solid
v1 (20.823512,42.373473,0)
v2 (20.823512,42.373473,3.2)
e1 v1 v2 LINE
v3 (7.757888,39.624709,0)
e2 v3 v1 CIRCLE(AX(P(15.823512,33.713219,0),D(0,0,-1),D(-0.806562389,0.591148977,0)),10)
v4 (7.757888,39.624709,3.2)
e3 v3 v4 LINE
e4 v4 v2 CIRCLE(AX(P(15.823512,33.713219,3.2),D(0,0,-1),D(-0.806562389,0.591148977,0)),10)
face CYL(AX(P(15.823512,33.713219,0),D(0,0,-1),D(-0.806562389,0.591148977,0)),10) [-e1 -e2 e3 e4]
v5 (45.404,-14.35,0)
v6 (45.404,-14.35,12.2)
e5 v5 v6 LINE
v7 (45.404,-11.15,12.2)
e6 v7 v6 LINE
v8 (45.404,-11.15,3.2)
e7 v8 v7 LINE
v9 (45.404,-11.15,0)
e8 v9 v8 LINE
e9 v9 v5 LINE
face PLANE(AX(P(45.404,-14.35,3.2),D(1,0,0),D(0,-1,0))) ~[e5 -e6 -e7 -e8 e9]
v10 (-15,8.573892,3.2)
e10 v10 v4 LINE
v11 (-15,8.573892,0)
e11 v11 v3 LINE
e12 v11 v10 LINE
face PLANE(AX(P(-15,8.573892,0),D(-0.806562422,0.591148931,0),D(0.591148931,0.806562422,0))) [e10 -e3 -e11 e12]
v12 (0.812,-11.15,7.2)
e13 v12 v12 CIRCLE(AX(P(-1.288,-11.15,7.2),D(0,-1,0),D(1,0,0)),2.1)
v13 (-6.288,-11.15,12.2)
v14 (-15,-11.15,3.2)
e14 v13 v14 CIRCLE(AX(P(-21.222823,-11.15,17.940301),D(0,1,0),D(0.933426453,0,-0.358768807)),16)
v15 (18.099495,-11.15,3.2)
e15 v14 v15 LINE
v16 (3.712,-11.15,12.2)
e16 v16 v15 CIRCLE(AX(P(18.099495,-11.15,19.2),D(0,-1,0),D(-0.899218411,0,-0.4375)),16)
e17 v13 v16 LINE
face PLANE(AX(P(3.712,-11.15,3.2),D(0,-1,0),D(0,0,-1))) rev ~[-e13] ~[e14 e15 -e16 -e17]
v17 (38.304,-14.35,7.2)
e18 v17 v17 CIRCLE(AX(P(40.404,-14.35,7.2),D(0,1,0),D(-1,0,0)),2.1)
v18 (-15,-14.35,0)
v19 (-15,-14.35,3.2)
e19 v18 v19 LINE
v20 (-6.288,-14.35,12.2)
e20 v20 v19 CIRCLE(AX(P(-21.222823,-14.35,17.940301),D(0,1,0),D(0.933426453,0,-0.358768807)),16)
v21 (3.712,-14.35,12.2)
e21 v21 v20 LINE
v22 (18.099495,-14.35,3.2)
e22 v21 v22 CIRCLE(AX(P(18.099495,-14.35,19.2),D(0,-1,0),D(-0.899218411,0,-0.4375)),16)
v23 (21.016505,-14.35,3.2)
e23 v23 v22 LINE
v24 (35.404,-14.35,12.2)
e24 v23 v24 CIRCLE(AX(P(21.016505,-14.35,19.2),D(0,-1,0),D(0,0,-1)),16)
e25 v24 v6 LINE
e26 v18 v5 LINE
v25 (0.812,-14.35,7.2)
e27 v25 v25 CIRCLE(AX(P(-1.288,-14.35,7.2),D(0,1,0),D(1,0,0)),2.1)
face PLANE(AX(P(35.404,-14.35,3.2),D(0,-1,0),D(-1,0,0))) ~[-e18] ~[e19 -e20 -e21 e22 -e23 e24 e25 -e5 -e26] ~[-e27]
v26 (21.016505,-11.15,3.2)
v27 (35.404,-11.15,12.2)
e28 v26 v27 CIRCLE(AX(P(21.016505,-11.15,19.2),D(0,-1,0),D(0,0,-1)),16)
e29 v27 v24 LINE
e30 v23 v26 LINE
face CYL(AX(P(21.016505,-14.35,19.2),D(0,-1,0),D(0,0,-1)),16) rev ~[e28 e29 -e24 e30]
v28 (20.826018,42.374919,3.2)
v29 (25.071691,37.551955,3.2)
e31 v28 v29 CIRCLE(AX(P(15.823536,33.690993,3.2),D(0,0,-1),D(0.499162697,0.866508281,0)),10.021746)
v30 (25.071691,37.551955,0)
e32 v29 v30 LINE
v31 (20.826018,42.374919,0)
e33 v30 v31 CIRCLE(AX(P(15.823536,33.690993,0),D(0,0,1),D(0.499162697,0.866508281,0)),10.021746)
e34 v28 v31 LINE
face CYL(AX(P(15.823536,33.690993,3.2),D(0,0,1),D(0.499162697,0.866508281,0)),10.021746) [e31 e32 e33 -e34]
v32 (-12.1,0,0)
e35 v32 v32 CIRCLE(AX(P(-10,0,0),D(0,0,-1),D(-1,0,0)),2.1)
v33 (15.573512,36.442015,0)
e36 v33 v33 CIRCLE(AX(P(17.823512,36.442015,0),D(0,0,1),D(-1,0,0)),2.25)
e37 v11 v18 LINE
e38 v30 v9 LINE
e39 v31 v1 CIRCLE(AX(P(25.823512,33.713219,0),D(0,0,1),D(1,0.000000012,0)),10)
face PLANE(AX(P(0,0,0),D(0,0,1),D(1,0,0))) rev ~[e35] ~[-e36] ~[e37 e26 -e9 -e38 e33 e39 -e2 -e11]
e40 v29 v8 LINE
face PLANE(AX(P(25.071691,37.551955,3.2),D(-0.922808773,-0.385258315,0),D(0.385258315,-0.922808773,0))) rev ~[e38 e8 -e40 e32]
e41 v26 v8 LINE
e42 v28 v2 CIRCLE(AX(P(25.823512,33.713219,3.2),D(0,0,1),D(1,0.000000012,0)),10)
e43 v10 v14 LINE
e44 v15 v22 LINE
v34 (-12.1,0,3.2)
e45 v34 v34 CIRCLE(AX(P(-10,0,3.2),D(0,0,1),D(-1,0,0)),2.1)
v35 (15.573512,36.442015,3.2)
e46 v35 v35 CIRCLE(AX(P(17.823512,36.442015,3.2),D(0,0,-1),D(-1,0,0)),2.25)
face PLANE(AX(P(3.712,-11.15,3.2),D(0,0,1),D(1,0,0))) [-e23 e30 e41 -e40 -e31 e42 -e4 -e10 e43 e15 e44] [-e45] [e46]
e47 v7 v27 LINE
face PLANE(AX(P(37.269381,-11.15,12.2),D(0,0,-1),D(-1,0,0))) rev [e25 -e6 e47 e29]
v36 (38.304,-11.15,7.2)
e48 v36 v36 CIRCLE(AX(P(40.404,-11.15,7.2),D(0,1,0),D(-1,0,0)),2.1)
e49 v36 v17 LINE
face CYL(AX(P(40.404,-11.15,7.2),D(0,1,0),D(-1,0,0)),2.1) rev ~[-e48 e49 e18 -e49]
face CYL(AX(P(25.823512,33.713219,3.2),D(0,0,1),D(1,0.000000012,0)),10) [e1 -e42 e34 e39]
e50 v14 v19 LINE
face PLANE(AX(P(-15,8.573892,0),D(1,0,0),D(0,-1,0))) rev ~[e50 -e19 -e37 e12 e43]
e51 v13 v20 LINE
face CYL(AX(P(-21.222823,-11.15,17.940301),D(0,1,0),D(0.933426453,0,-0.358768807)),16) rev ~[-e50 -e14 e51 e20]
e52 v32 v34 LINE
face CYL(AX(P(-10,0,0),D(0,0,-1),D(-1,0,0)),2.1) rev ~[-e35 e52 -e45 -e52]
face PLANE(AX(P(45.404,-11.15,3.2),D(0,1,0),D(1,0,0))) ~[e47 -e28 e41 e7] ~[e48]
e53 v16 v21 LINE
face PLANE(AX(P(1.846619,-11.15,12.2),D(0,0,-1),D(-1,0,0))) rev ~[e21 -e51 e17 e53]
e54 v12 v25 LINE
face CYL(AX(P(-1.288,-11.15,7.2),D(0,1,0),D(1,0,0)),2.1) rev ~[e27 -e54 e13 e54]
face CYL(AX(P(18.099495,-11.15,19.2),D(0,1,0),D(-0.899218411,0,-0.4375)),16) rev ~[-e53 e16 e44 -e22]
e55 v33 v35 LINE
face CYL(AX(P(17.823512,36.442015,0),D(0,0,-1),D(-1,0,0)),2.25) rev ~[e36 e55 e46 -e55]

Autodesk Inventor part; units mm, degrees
ref_plane "YZ Plane" through (0, 0, 0) normal (1, 0, 0) x (0, 1, 0)
ref_plane "XZ Plane" through (0, 0, 0) normal (0, 1, 0) x (-1, 0, 0)
ref_plane "XY Plane" through (0, 0, 0) normal (0, 0, 1) x (1, 0, 0)
sketch "Эскиз1" plane through (0, 0, 0) normal (0, 0, 1) x (1, 0, 0)
  circle A0 centre (0, 0) radius 2.1
  line L0 (-5, 14.35) -> (5, 14.35)
  line L1 (5, 14.35) -> (5, -14.35)
  line L2 (5, -14.35) -> (-5, -14.35)
  line L3 (-5, -14.35) -> (-5, 14.35)
  line L4 (-5, 14.35) -> (5, -14.35) construction
  line L5 (5, 14.35) -> (-5, -14.35) construction
  line L6 (-5, 7) -> (5, 7)
  dimension "d0" = 4.2
  dimension "d2" = 10
  dimension "d3" = 28.7
  dimension "d4" = 7
extrude "Выдавливание1" add sketch "Эскиз1" along normal blind 3.2 contours L6 L1 L2 L3
sketch "Эскиз2" plane through (0, 0, 3.2) normal (0, 0, 1) x (1, 0, 0)
  line L0 (5, -14.35) -> (5, 7) projected
  line L1 (5, -14.35) -> (-5, -14.35)
  line L2 (-5, -14.35) -> (-5, -11.15)
  line L3 (-5, -11.15) -> (5, -11.15)
  line L4 (5, -11.15) -> (5, -14.35)
  point P0 (0, 0)
  point P1 (5, -11.15)
  dimension "d7" = 10
  dimension "d8" = 3.2
extrude "Выдавливание2" add sketch "Эскиз2" along normal blind 13
sketch "Эскиз3" plane through (-5, -11.15, 16.2) normal (0, 1, 0) x (1, 0, 0)
  line L0 (0, 10) -> (10, 10) projected
  line L1 (5, 10) -> (5, 0)
  line L2 (0, 0) -> (10, 0) projected
  circle A0 centre (5, 5) radius 2.1
  point P0 (5, 16.2)
  dimension "d12" = 4.2
extrude "Выдавливание3" cut sketch "Эскиз3" against normal blind 13
sketch "Эскиз4" plane through (0, 0, 3.2) normal (0, 0, 1) x (1, 0, 0)
  circle A0 centre (27.823512, 36.442015) radius 2.691667
  line L0 (25.598764, 34.926903) -> (0, 0)
  line L1 (17.757888, 39.624709) -> (-5, 8.573892)
  line L2 (-5, 7) -> (-5, -11.15)
  line L3 (-5, 7) -> (-5, 8.573892)
  line L4 (-5, -14.35) -> (5, -14.35)
  line L5 (5, -14.35) -> (5, -11.15)
  line L6 (5, -11.15) -> (-5, -11.15)
  line L7 (-5, -11.15) -> (-5, -14.35)
  line L8 (27.823512, 36.442015) -> (27.823512, -3.381482)
  line L9 (35.823512, 33.713219) -> (35.823512, -14.35)
  arc A1 (35.823512, 33.713219) -> (17.757888, 39.624709) centre (25.823512, 33.713219) ccw
  line L10 (-5, -14.35) -> (35.823512, -14.35)
  circle A2 centre (27.823512, 36.442015) radius 2.25
  line L11 (-5, 8.573892) -> (-5, -14.35)
  circle A3 centre (0, 0) radius 2.1
  point P0 (-5, -8.15)
  point P1 (-5, -11.15)
  dimension "d15" = 10
  dimension "d16" = 8
  dimension "d17" = 10
  dimension "d18" = 4.5
extrude "Выдавливание4" add sketch "Эскиз4" against normal up to surface (3.2 mm away) contours A0 | A1 L9 L10 L5 L6 L2 L3 L1
ref_plane "РабПлоскость1" through (20.202, -14.35, 16.2) normal (-1, 0, 0) x (0, 0, 1)
mirror "Зеркальное отражение1" about plane through (20.202, -14.35, 16.2) normal (-1, 0, 0) of "Выдавливание2", "Выдавливание3"
sketch "Эскиз6" plane through (0, 0, 0) normal (0, 0, -1) x (-1, 0, 0)
  circle A0 centre (-17.823512, 36.442015) radius 2.25
  circle A1 centre (10, 0) radius 2.1
  line L0 (5, -14.35) -> (-35.823512, -14.35)
  line L1 (5, -14.35) -> (5, 8.573892)
  line L2 (15, 8.573892) -> (-7.757888, 39.624709)
  arc A2 (-7.757888, 39.624709) -> (-25.823512, 33.713219) centre (-15.823512, 33.713219) ccw
  line L3 (-25.823512, 33.713219) -> (-25.823512, -14.35)
  circle A3 centre (-27.823512, 36.442015) radius 2.25
  circle A4 centre (0, 0) radius 2.1
  line L4 (5, -14.35) -> (-35.823512, -14.35)
  line L5 (5, -14.35) -> (5, 8.573892)
  line L6 (5, 8.573892) -> (-17.757888, 39.624709)
  arc A5 (-17.757888, 39.624709) -> (-35.823512, 33.713219) centre (-25.823512, 33.713219) ccw
  line L7 (-35.823512, 33.713219) -> (-35.823512, -14.35)
  line L8 (-35.823512, -14.35) -> (-35.823512, -11.15)
  line L9 (-35.823512, -11.15) -> (-45.404, -11.15)
  line L10 (-45.404, -11.15) -> (-45.404, -14.35)
  line L11 (-45.404, -14.35) -> (-35.823512, -14.35)
  line L12 (-25.823512, -14.35) -> (-45.404, -14.35)
  line L13 (0, 0) -> (10, 0)
  line L14 (15, 8.573892) -> (15, -18.0489)
  line L15 (-5, -14.35) -> (-35.404, -14.35)
  line L16 (-8, -14.35) -> (16.577235, -14.35)
  line L17 (-45.404, -11.15) -> (-35.708646, 35.224555)
  point P0 (-10, 0)
  point P1 (-20.823512, 42.373473)
  point P2 (15, -14.35)
  point P3 (-16.942673, 38.512431)
  point P4 (-15.583961, 36.658607)
  point P5 (5, 8.573892)
  dimension "d35" = 10
extrude "Выдавливание5" add sketch "Эскиз6" against normal up to surface (3.2 mm away) contours A0 L6 A5 A2 L2 L14 L16 L1 | A5 L7 L9 L17 | L9 L7 L11 L10
extrude "Выдавливание6" cut sketch "Эскиз6" against normal blind 10 contours A0 L6 | L6 A0 | A1
sketch "Эскиз7" plane through (0, 0, 3.2) normal (0, 0, 1) x (1, 0, 0)
  circle A0 centre (0, 0) radius 2.1
  line L0 (35.404, -14.35) -> (35.404, -11.15)
  line L1 (5, -14.35) -> (35.404, -14.35)
  arc A1 (35.708646, 35.224555) -> (20.823512, 42.373473) centre (25.823512, 33.713219) ccw
  line L2 (30.823512, 42.373473) -> (-5, -8.15)
  line L3 (35.404, -11.15) -> (45.404, -11.15)
  arc A2 (20.823512, 42.373473) -> (7.757888, 39.624709) centre (15.823512, 33.713219) ccw
  line L4 (-15, 8.573892) -> (7.757888, 39.624709)
  line L5 (-15, -14.35) -> (-15, 8.573892)
  line L6 (-5, -14.35) -> (-15, -14.35)
  line L7 (-5, -11.15) -> (-5, -14.35)
  circle A3 centre (17.823512, 36.442015) radius 2.25
  circle A4 centre (17.823512, 36.442015) radius 2.25
  circle A5 centre (27.823512, 36.442015) radius 2.25
  circle A6 centre (0, 0) radius 2.1
  circle A7 centre (-10, 0) radius 2.1
  line L8 (5, -14.35) -> (35.404, -14.35)
  line L9 (35.404, -14.35) -> (35.404, -11.15)
  line L10 (35.404, -11.15) -> (45.404, -11.15)
  arc A8 (35.708646, 35.224555) -> (20.823512, 42.373473) centre (25.823512, 33.713219) ccw
  arc A9 (20.823512, 42.373473) -> (7.757888, 39.624709) centre (15.823512, 33.713219) ccw
  line L11 (-15, 8.573892) -> (7.757888, 39.624709)
  line L12 (-15, -14.35) -> (-15, 8.573892)
  line L13 (-5, -14.35) -> (-15, -14.35)
  line L14 (-5, -11.15) -> (-5, -14.35)
  line L15 (35.708646, 35.224555) -> (45.404, -11.15)
  line L16 (35.708646, 35.224555) -> (45.404, -11.15)
  circle A10 centre (15.823537, 33.690994) radius 10.021745
  circle A11 centre (25.823512, 33.713219) radius 10
  line L17 (35.708646, 35.224555) -> (-5, 35.224555)
  line L18 (45.404, -11.15) -> (25.071691, 37.551955)
  line L19 (5, -14.35) -> (5, -11.15)
  line L20 (5, -14.35) -> (5, -11.15)
  line L21 (-5, -11.15) -> (5, -11.15)
  line L22 (-5, -11.15) -> (5, -11.15)
  point P0 (-0.639537, -2.000248)
  point P1 (1.675949, 1.265384)
  point P2 (20.826018, 42.374919)
extrude "Выдавливание7" add sketch "Эскиз7" against normal up to surface (3.2 mm away) contours A0 L2 | L2 A0 | L17 L18 L2 A5 | A5 L18 L17 | A5 L17 L18 | L2 L18 A5 | L17 A5 L2 L18 | L2 A5 L18
sketch "Эскиз7 outline for Выдавливание8" plane through (0, 0, 3.2) normal (0, 0, 1) x (1, 0, 0)
  arc A0 (35.708646, 35.224555) -> (20.826018, 42.374919) centre (25.823512, 33.713219) ccw
  line L0 (45.404, -11.15) -> (35.708646, 35.224555)
  line L1 (25.071691, 37.551955) -> (45.404, -11.15)
  arc A1 (20.826018, 42.374919) -> (25.071691, 37.551955) centre (15.823537, 33.690994) cw
extrude "Выдавливание8" cut sketch "Эскиз7 outline for Выдавливание8" against normal blind 10
sketch "Эскиз9" plane through (-5, -11.15, 16.2) normal (0, 1, 0) x (1, 0, 0)
  circle A0 centre (3.712, 5) radius 2.1
  line L0 (-1.288, 10) -> (8.712, 10)
  line L1 (-1.288, 10) -> (-1.288, 0)
  line L2 (8.712, 0) -> (-1.288, 0)
  line L3 (8.712, 13) -> (8.712, 0)
  line L4 (50.404, 13) -> (30.071691, 13)
  line L5 (30.071691, 13) -> (25.826018, 13)
  line L6 (25.826018, 13) -> (25.823512, 13)
  line L7 (12.757888, 13) -> (25.823512, 13)
  line L8 (-10, 13) -> (12.757888, 13)
  line L9 (0, 13) -> (-10, 13)
  line L10 (10, 13) -> (40.404, 13)
  line L11 (25.073512, 13) -> (20.573512, 13)
  line L12 (-7.1, 13) -> (-2.9, 13)
  line L13 (-1.288, 10) -> (-1.288, 15.274869)
  line L14 (0, 13) -> (0, 0)
  line L15 (0, 13) -> (0, 0)
  circle A1 centre (5, 5) radius 2.1
  line L16 (0, 13) -> (0, 0)
  line L17 (10, 0) -> (0, 0)
  line L18 (10, 13) -> (10, 0)
  line L19 (0, 13) -> (10, 13)
  line L20 (0, 13) -> (10, 13)
  line L21 (8.712, 10) -> (12.757888, 10)
  line L22 (3.712, 5) -> (3.712, 9)
  circle A2 centre (3.712, 9) radius 2.1
  line L23 (11.441296, 4) -> (-2.9, 4)
  line L24 (40.404, 13) -> (50.404, 13)
  point P0 (5, 16.2)
  point P1 (0, 10)
  point P2 (-1.288, 13)
  point P3 (0, 10)
  point P4 (-1.288, 4)
  point P5 (8.712, 4)
  dimension "d42" = 4
  dimension "d43" = 4.2
  dimension "d44" = 4
extrude "Выдавливание10" add sketch "Эскиз9" against normal up to surface (3.2 mm away) contours A0 L23 A1 | A0 A1 L23 | A1 L22 A2 A0 | A0 A2 L0 L3 L23 A1 | L23 A1 A0 | A0 A1 L23 | A2 L22 A0 | A0 A2 L0 | A1 L23 A0 A2 L22 | A1 L23 L3 L2 L14 A0 | A0 L23 A1 | L22 A2 A0 | L23 L14 L0 A2 A0 | L23 L1 L0 L14 | L14 L2 L1 L23 | L0 L13 L8 L14
extrude "Выдавливание11" cut sketch "Эскиз9" against normal blind 10 contours L23 A1 A0 | A0 A1 L23 | A2 L22 A0 | A0 A2 L0 | A1 L23 L3 L2 L14 A0 | A0 L23 A1 | L22 A2 A0 | L23 L18 L17 L3 | L3 L21 L18 L23 | L0 A2 | L14 L2 L1 L23 | L3 L8 L18 L21 picked at (6.324605, 3.867911) picked at (4.682533, 3.889371) picked at (2.387395, 3.867911)
ref_plane "РабПлоскость2" through (19.558, -14.35, 16.2) normal (-1, 0, 0) x (0, 0, 1)
mirror "Зеркальное отражение2" about plane through (19.558, -14.35, 16.2) normal (-1, 0, 0) of "Выдавливание11", "Выдавливание10"
fillet "Сопряжение5" radius 16 3 edges at (35.404, -12.75, 3.2) (3.712, -12.75, 3.2) (-6.288, -12.75, 3.2)
properties part number "мертвое колесо 3"
